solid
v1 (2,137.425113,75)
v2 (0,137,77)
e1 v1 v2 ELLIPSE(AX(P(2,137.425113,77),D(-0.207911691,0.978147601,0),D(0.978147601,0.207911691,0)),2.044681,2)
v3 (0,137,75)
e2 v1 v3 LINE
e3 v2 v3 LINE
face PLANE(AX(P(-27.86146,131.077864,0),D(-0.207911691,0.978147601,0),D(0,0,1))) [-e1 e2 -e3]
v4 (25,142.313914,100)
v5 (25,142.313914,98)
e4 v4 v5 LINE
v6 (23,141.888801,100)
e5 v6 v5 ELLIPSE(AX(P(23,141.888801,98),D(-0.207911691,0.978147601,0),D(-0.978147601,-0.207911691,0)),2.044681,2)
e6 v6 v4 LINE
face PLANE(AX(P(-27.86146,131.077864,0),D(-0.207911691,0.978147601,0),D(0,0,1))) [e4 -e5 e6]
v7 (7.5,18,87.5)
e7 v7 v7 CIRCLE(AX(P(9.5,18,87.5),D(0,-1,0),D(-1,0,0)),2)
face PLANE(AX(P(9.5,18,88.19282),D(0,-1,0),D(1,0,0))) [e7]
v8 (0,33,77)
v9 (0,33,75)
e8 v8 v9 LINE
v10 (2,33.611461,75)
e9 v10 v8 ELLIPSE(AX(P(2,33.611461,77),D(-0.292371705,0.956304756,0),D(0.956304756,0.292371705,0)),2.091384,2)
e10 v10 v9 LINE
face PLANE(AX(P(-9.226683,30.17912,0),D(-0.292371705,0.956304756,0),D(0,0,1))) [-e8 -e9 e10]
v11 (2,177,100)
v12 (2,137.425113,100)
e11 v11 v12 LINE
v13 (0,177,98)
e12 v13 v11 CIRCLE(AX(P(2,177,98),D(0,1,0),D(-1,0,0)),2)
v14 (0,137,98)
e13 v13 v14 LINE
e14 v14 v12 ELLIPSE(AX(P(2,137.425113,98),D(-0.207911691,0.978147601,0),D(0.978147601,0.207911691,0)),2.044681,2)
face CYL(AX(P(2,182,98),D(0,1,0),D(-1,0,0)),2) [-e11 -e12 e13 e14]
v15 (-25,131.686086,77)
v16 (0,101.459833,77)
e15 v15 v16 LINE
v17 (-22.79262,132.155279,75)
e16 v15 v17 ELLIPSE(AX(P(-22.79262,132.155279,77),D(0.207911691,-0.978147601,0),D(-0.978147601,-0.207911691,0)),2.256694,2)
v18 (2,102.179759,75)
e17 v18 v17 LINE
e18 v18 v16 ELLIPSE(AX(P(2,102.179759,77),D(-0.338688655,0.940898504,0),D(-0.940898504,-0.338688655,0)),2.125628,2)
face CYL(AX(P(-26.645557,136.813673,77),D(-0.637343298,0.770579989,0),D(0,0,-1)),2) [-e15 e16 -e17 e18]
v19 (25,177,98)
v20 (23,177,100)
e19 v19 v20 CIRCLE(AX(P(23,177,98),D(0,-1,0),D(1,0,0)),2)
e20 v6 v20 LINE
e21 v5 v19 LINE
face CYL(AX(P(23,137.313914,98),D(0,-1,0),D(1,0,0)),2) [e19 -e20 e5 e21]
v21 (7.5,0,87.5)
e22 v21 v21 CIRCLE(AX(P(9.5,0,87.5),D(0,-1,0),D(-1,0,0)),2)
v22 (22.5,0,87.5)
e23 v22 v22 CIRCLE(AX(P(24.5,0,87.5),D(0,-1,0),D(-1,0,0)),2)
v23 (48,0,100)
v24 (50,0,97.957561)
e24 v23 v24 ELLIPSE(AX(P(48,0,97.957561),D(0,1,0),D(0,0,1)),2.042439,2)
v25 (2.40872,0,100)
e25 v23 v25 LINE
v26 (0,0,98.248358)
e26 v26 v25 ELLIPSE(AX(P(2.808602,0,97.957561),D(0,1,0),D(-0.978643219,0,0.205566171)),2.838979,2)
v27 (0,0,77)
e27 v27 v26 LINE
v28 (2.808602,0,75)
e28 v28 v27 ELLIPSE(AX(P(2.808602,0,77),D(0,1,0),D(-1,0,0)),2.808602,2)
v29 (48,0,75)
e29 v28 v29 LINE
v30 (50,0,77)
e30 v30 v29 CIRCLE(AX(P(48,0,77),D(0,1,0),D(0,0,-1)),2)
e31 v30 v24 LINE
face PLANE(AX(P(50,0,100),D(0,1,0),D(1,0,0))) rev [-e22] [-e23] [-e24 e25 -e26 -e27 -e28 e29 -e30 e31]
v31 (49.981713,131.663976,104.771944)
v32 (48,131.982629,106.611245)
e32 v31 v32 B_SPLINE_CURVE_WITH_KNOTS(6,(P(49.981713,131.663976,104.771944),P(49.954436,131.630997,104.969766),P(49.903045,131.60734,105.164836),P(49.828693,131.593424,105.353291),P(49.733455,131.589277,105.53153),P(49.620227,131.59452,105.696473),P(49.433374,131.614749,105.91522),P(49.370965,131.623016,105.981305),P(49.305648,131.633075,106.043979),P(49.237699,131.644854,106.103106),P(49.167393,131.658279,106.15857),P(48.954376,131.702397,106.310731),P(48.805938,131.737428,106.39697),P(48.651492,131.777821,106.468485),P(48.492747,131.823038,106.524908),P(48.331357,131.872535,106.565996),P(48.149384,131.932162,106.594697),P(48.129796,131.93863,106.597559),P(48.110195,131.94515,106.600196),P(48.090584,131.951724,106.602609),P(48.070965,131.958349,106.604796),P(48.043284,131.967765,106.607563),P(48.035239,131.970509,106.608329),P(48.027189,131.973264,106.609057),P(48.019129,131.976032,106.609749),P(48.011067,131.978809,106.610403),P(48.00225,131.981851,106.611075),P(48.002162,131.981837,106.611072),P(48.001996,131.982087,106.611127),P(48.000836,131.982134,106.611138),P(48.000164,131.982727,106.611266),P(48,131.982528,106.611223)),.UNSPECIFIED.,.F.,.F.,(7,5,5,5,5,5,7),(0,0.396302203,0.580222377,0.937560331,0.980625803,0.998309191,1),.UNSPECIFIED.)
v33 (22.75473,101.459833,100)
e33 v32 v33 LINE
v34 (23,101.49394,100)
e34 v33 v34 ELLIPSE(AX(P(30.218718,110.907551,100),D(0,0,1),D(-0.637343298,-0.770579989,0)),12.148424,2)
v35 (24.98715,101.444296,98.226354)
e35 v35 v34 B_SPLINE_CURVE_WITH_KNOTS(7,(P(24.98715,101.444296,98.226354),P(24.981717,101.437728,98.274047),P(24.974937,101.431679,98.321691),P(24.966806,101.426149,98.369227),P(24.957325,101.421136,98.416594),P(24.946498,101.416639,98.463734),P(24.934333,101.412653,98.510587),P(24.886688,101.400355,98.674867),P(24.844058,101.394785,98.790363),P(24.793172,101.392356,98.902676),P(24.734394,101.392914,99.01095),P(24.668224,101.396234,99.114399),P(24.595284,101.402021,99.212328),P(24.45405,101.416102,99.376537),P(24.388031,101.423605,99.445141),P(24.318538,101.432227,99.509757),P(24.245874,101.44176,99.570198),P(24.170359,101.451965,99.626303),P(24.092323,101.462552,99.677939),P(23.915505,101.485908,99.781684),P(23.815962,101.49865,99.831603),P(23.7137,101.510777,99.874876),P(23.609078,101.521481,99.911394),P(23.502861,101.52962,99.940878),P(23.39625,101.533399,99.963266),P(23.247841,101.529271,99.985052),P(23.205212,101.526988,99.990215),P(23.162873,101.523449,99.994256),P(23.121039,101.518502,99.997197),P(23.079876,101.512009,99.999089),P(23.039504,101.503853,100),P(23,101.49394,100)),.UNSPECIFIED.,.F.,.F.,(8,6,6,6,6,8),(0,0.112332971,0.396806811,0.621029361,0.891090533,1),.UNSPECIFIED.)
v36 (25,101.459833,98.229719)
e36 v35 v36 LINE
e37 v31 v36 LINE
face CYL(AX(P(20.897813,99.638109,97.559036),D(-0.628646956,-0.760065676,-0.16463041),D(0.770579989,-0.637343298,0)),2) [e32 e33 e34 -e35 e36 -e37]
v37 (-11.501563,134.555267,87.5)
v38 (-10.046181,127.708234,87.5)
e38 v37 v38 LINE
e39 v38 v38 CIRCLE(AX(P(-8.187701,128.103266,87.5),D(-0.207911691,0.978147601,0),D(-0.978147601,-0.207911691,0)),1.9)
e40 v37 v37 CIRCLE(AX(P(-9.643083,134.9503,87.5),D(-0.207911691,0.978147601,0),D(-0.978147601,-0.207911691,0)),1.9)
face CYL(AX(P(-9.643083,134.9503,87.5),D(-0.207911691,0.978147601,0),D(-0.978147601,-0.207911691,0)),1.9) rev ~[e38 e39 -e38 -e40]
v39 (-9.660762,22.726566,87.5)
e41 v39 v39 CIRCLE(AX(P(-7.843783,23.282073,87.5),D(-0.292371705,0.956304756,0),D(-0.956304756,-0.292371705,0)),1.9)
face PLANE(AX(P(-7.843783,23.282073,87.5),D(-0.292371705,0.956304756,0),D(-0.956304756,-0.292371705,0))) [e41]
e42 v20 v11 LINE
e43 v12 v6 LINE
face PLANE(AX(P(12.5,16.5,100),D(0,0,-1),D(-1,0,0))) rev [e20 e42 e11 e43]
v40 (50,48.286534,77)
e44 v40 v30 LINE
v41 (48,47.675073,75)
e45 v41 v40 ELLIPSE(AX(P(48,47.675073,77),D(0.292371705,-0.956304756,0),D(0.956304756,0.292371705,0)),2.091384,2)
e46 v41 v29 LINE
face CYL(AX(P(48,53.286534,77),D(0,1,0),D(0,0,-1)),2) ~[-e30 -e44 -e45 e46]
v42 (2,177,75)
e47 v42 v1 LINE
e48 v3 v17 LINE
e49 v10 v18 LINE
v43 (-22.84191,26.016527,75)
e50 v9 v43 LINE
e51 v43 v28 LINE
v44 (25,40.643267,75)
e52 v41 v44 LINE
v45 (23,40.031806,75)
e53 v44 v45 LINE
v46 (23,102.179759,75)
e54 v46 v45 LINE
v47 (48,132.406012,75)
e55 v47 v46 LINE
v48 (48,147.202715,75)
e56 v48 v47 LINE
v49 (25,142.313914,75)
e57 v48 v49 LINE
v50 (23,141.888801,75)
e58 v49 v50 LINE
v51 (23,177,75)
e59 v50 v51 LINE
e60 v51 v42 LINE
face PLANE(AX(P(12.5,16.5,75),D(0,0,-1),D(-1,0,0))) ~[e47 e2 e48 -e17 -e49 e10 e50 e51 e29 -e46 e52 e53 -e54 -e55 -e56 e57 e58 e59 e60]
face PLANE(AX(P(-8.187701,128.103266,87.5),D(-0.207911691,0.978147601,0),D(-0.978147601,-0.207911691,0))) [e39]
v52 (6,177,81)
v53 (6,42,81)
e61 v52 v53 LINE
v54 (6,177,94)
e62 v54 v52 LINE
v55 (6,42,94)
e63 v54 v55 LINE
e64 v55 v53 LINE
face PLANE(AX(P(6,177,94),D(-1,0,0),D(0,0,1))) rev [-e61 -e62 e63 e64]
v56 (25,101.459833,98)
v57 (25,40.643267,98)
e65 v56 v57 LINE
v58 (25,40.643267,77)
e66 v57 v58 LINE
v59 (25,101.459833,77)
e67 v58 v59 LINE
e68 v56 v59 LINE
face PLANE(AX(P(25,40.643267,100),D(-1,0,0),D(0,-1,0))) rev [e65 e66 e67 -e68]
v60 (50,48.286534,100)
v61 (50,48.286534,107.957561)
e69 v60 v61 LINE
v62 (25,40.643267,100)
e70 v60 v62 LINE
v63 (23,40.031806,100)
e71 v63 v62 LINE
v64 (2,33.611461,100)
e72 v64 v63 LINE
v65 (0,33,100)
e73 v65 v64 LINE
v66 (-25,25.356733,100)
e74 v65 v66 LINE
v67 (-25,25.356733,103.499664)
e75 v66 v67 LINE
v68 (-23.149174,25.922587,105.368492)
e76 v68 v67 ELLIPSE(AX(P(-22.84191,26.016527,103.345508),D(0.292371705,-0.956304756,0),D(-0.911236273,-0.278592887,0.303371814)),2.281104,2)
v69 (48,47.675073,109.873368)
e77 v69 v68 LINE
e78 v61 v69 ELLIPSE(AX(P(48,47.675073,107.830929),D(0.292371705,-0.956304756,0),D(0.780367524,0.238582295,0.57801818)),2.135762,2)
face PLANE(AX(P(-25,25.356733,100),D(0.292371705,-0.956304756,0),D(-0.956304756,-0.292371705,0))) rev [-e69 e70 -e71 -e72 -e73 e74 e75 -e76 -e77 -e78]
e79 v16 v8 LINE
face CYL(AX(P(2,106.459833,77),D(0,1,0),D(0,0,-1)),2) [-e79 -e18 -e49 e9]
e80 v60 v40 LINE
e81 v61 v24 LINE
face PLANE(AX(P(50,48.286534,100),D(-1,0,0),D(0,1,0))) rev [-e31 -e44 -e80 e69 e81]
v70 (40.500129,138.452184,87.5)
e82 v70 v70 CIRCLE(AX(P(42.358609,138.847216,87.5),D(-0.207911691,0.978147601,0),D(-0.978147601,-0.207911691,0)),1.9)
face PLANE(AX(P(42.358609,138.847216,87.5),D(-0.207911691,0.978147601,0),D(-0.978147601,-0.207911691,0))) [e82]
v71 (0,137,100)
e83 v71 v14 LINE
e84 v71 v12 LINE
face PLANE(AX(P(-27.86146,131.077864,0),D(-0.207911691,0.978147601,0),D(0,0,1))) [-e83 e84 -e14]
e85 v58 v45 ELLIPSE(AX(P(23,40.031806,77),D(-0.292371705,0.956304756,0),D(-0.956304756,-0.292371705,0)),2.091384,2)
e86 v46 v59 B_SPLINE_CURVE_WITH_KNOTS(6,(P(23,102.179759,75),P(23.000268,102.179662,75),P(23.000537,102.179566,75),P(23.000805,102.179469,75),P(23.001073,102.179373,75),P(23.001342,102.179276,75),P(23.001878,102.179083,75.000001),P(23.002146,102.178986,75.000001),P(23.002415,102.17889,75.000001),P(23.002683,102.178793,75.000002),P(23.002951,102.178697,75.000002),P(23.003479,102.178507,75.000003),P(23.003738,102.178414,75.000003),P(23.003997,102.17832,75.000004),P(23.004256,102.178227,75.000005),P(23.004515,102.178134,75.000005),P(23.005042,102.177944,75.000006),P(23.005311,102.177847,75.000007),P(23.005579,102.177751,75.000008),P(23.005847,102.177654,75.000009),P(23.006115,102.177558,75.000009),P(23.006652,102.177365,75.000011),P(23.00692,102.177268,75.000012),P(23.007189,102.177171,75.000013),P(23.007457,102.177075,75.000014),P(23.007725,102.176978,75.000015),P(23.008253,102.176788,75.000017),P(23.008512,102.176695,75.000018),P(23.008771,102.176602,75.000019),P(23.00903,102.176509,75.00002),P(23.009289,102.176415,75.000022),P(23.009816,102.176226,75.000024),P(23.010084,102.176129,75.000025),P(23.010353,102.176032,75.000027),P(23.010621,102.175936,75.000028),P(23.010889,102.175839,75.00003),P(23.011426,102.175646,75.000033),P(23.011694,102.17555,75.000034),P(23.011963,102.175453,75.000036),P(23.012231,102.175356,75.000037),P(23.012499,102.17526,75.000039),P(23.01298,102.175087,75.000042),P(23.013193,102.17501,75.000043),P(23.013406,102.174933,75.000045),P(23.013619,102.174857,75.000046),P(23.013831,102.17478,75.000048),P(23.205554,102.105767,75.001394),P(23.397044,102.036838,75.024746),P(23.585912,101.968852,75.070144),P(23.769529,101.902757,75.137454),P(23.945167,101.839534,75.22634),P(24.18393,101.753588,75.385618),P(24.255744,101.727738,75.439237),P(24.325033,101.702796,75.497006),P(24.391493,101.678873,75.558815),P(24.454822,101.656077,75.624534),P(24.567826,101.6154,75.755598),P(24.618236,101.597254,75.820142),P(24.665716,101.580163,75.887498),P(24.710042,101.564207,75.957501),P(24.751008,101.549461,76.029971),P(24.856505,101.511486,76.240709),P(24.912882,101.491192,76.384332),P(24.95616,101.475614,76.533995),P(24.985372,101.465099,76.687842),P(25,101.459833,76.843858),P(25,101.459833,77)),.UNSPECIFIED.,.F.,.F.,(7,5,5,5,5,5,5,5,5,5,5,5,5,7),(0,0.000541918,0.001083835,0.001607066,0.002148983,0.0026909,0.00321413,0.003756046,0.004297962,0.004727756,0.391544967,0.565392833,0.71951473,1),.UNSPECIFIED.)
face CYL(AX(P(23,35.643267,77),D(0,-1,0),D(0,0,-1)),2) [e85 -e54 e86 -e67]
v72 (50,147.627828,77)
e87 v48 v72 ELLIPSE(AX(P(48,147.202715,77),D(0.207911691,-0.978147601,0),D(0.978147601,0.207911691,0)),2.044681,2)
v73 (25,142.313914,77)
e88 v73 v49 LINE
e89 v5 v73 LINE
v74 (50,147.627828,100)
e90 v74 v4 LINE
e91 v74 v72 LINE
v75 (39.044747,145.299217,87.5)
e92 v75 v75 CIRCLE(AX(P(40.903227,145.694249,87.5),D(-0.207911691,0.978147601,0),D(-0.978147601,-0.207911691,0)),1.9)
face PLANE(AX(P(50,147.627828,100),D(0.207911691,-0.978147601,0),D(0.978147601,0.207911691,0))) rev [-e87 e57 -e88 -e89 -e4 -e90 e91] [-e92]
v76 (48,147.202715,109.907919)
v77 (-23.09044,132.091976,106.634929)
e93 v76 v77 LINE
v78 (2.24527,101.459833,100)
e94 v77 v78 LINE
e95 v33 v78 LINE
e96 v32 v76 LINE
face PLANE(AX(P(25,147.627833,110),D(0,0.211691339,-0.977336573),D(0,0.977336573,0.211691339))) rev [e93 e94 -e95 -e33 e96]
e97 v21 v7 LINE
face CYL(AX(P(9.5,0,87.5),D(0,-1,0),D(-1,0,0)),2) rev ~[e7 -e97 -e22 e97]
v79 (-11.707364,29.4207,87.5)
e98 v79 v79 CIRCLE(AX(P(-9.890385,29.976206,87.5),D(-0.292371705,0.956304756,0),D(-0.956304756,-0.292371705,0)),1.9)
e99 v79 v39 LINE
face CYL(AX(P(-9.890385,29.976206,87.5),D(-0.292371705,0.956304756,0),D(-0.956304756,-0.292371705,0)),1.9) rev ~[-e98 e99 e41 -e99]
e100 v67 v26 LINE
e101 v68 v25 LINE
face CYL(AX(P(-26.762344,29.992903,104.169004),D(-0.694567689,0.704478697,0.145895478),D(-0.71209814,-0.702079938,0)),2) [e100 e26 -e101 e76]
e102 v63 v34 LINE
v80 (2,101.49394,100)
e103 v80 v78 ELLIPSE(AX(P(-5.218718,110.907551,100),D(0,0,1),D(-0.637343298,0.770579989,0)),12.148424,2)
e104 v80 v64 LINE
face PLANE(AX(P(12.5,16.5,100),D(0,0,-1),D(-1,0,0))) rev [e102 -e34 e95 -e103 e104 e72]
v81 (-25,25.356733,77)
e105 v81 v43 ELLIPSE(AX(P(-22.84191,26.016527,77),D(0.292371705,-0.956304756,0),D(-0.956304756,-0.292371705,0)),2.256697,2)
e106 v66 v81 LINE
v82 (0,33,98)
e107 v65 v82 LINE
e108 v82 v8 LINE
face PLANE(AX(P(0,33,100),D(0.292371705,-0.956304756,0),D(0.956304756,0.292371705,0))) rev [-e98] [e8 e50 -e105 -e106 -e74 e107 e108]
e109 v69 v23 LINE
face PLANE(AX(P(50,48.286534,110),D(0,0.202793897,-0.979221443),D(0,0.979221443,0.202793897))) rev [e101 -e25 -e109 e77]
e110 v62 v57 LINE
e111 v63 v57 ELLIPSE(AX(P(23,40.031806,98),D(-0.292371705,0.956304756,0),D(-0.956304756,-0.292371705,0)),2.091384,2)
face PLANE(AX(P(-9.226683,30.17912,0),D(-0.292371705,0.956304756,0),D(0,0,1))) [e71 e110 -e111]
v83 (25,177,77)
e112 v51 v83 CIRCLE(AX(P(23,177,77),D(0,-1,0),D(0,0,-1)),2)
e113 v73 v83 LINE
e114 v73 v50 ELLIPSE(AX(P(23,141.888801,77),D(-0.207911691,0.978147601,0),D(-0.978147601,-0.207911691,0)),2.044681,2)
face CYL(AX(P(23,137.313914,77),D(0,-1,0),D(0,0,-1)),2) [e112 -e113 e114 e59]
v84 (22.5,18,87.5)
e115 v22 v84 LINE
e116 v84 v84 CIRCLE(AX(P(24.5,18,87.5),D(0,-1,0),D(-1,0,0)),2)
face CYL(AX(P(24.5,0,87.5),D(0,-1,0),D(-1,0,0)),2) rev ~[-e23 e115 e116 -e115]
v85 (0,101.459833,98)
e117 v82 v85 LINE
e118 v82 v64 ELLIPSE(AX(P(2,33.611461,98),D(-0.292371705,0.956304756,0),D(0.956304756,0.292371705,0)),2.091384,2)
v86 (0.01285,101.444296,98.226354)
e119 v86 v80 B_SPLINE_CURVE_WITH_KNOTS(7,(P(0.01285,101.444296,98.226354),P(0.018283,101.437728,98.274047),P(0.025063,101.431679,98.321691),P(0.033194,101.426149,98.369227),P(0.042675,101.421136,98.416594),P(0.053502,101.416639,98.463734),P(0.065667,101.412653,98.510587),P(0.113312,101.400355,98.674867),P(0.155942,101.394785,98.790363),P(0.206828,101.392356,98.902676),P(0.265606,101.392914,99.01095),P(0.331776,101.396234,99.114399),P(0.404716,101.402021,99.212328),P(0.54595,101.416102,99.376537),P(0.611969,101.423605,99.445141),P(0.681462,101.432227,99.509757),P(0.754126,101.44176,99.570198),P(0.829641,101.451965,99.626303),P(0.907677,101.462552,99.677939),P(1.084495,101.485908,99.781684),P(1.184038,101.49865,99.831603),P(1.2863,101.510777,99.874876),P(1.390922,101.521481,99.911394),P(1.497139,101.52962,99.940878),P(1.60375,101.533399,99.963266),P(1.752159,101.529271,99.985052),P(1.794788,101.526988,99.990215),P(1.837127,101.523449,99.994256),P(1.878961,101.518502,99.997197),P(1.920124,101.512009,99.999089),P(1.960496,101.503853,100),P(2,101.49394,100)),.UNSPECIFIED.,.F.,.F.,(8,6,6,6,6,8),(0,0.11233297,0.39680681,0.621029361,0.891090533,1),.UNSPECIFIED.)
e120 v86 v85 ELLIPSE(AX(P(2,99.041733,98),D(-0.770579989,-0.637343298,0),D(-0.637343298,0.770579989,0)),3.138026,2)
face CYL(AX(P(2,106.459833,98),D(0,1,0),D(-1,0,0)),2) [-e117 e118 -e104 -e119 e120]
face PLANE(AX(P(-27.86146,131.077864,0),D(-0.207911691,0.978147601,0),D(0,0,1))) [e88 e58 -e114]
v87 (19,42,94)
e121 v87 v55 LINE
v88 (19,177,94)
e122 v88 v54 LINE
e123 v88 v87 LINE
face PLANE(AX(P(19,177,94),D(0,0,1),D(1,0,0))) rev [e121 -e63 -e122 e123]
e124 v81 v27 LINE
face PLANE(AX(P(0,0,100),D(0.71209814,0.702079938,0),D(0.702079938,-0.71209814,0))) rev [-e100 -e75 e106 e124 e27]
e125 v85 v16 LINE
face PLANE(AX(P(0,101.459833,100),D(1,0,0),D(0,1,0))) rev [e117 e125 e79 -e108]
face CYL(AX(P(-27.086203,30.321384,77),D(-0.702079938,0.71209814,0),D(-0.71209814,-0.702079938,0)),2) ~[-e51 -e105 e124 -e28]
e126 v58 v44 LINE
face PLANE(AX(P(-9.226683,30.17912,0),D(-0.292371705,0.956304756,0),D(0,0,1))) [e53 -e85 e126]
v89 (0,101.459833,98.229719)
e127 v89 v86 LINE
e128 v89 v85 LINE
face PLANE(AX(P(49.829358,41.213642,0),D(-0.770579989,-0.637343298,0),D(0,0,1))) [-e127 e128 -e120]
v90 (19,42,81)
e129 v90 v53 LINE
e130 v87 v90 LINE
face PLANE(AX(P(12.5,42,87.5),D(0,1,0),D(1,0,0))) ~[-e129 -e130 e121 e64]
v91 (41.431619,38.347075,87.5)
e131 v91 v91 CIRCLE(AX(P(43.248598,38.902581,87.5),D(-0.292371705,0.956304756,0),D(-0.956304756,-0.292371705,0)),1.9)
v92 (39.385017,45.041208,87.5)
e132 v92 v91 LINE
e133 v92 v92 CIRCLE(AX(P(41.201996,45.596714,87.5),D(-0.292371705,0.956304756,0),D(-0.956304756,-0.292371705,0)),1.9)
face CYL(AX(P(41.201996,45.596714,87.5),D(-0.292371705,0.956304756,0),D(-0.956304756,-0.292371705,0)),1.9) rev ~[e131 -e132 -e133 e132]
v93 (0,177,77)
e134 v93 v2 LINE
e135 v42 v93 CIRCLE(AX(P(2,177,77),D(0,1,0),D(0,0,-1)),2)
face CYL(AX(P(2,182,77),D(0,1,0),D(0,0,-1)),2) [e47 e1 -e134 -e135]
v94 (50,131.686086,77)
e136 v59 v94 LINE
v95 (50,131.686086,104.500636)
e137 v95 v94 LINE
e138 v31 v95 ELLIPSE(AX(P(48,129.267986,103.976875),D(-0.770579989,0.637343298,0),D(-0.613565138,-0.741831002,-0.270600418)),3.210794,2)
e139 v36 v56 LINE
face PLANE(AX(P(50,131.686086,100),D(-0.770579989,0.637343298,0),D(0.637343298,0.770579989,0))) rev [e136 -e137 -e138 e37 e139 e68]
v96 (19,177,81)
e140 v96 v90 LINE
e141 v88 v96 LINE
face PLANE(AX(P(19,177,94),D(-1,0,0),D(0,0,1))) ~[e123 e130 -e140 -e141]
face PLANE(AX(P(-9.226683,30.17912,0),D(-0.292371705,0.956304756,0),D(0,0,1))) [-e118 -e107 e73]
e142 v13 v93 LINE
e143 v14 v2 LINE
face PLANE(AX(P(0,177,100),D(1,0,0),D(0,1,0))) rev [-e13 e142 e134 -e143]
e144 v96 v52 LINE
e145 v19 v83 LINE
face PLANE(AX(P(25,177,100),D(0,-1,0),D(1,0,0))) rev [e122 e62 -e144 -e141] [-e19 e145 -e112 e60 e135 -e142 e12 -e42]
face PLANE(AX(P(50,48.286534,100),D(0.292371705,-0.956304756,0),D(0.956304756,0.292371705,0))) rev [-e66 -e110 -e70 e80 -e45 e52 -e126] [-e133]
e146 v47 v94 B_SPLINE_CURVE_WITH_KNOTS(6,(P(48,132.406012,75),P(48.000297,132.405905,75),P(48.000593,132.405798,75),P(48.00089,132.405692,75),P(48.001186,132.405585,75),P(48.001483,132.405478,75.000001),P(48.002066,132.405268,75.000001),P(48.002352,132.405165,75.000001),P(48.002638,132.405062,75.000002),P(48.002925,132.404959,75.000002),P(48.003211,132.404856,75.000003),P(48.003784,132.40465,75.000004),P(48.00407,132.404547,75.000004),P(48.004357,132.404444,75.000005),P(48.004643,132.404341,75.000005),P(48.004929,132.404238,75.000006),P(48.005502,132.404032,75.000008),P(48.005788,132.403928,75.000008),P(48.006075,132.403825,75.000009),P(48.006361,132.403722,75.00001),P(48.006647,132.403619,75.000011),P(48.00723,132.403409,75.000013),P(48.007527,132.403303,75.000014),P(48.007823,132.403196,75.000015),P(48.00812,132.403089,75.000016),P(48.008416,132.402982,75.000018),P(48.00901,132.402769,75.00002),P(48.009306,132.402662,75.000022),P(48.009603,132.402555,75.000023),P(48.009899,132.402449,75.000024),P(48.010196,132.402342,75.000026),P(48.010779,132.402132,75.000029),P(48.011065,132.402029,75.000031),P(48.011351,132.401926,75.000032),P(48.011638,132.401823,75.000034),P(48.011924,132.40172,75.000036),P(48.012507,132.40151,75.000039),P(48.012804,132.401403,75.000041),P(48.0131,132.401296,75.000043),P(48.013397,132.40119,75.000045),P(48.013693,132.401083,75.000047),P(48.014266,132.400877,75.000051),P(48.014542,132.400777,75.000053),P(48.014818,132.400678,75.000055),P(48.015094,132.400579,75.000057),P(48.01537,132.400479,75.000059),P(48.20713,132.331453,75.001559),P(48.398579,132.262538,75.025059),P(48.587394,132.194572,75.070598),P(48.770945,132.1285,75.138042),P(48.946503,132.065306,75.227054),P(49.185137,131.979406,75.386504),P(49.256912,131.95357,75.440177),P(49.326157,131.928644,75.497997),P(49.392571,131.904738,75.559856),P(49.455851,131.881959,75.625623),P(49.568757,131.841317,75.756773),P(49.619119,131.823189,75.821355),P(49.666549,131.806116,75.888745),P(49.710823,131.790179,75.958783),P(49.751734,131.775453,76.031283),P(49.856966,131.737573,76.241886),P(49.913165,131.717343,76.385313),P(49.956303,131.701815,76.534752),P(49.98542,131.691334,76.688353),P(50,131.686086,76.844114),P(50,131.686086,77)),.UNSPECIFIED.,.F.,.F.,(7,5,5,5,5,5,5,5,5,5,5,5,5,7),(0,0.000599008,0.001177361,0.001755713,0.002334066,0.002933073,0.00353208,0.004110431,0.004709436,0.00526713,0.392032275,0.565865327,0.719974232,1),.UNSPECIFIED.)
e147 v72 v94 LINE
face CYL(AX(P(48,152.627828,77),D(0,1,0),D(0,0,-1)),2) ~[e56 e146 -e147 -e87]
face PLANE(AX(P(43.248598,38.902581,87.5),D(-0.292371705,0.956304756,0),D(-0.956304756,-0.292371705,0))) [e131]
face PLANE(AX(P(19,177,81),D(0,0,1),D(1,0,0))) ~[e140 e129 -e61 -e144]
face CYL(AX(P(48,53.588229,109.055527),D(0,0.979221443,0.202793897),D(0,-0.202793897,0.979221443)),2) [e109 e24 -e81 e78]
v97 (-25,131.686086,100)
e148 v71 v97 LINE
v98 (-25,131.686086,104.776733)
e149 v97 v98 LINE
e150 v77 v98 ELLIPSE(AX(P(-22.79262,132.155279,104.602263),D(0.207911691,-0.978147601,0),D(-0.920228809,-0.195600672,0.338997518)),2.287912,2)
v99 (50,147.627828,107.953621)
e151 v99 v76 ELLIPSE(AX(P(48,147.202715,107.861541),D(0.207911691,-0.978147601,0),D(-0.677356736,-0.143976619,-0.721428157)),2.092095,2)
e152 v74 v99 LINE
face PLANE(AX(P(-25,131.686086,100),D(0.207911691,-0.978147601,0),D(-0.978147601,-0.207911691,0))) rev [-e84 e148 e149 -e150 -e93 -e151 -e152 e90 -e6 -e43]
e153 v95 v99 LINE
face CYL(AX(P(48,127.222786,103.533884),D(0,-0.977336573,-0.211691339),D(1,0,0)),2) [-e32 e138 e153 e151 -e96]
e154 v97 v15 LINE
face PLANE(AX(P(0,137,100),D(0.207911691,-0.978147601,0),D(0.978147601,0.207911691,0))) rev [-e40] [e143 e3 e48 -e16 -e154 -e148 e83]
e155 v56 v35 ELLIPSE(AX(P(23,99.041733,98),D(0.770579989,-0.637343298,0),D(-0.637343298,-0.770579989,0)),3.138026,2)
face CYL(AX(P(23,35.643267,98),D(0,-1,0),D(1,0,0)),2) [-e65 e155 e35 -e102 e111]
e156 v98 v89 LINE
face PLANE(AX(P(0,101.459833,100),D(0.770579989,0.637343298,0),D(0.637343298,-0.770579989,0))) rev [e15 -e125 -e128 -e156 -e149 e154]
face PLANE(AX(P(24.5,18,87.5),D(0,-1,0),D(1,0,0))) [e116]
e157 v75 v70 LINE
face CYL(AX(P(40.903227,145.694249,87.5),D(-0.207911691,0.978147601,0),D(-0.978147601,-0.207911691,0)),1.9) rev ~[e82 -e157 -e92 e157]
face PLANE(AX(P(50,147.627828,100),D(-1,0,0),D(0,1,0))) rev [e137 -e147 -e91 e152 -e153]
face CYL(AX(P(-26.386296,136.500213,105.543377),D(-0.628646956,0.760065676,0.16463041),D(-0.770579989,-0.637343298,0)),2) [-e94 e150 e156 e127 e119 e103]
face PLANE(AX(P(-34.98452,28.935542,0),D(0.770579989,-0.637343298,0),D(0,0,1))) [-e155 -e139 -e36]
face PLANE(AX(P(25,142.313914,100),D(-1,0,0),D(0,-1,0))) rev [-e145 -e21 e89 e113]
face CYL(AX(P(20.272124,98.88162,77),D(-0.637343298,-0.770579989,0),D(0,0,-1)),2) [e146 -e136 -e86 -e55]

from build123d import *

# Parameters (mm, degrees)
F0_W           = 25
F0_H           = 33
F1_DEPTH       = 25
F3_DEPTH       = 10
F5_DEPTH       = 81.7
F7_DEPTH       = 10
F9_DEPTH       = 92
F10_W          = 13
F10_H          = 13
F11_DEPTH      = 135
F14_W          = 99.2073006928
F14_H          = 199.154949747
F15_DEPTH      = 88
F16_R          = 1.9
F17_DEPTH      = 7
F18_R          = 1.9
F19_DEPTH      = 7
F21_DEPTH      = 18
F22_T1_DEPTH   = 58.2865340729
F22_T3_DEPTH   = 59.3111485648
F22_T5_DEPTH   = 45.6084808239
F22_T7_DEPTH   = 44.6581070284
F22_T9_DEPTH   = 26.3114146799
F22_T11_DEPTH  = 25.9417421253
F22_T16_DEPTH  = 70.8165659944
F22_T23_DEPTH  = 70.8165659944
F22_T29_DEPTH  = 70.8165659944
F22_T35_DEPTH  = 78.4598330308
F22_T41_DEPTH  = 78.4598330308
F22_T47_DEPTH  = 78.4598330308
F22_T54_DEPTH  = 70.8165659944
F22_T60_DEPTH  = 78.4598330308
F22_T66_DEPTH  = 49.2253281189
F22_T71_DEPTH  = 48.4985768834
F22_T77_DEPTH  = 48.4985768834
F22_T83_DEPTH  = 48.4985768834
F22_T89_DEPTH  = 49.2253281189
F22_T94_DEPTH  = 48.4985768834
F22_T100_DEPTH = 48.4985768834
F22_T106_DEPTH = 48.4985768834
F22_T112_DEPTH = 44.6860859582
F22_T117_DEPTH = 50
F22_T122_DEPTH = 44.6860859582
F22_T127_DEPTH = 50
F22_T133_DEPTH = 70.8165659944
F22_T138_DEPTH = 48.4985768834
F22_T146_DEPTH = 48.4985768834
F22_T151_DEPTH = 78.4598330308
F22_T159_DEPTH = 70.8165659944
F22_T163_DEPTH = 49.2253281189
F22_T170_DEPTH = 49.2253281189
F22_T174_DEPTH = 78.4598330308


# Not quite as in the source:
# - a fillet or chamfer that OpenCascade refuses, or shapes differently, is made with other operations: its cross-section is extruded or revolved along the edge and cut away or added


with BuildPart() as f1:
    # F0 (on Top) → F1 (new body)
    with BuildSketch(Plane.XY):
        with Locations((12.5, 16.5)):
            Rectangle(F0_W, F0_H)
        Polygon((-25, 25.3567329635), (0, 0), (0, 33), align=None)
        with Locations((37.5, 16.5)):
            Rectangle(F0_W, F0_H)
        Polygon((25, 40.6432670365), (0, 33), (25, 33), align=None)
        Polygon((0, 101.4598330308), (0, 33), (25, 40.6432670365), (25, 101.4598330308), (25, 137), (0, 137), align=None)
        Polygon((25, 40.6432670365), (25, 33), (50, 33), (50, 48.2865340729), align=None)
        Polygon((-25, 131.6860859582), (0, 101.4598330308), (0, 137), align=None)
        Polygon((25, 137), (25, 101.4598330308), (50, 131.6860859582), (50, 147.6278280835), (25, 142.3139140418), align=None)
        Polygon((25, 142.3139140418), (0, 137), (25, 137), align=None)
        Polygon((0, 177), (0, 137), (25, 142.3139140418), (25, 177), align=None)
    extrude(amount=F1_DEPTH)

    # F2 (on face) → F3 (join)
    with BuildSketch(Plane(origin=(0, 0, 0), x_dir=(1, 0, 0), z_dir=(0, 0, -1))):
        Polygon((50, -131.6860859582), (25, -101.4598330308), (0, -101.4598330308), (-25, -131.6860859582), (50, -147.6278280835), align=None)
    extrude(amount=F3_DEPTH)

    # F4 (on face) → F5 (cut, symmetric)
    with BuildSketch(Plane.YZ.offset(25)):
        Polygon((101.4598330308, -21.1370438337), (147.6278330308, -10), (101.4598330308, 0), align=None)
    extrude(amount=F5_DEPTH, both=True, mode=Mode.SUBTRACT)

    # F6 (on face) → F7 (join)
    with BuildSketch(Plane(origin=(0, 0, 0), x_dir=(1, 0, 0), z_dir=(0, 0, -1))):
        Polygon((50, -48.2865340729), (50, 0), (0, 0), (-25, -25.3567329635), align=None)
    extrude(amount=F7_DEPTH)

    # F8 (on face) → F9 (cut)
    with BuildSketch(Plane.YZ.offset(50)):
        Polygon((48.2865340729, -10), (0, 0), (0, -39.534393698), (48.2865340729, -39.534393698), align=None)
    extrude(amount=-F9_DEPTH, mode=Mode.SUBTRACT)

    # F10 (on face) → F11 (cut)
    with BuildSketch(Plane(origin=(0, 177, 0), x_dir=(-1, 0, 0), z_dir=(0, 1, 0))):
        with Locations((-12.5, 12.5)):
            Rectangle(F10_W, F10_H)
    extrude(amount=-F11_DEPTH, mode=Mode.SUBTRACT)


with BuildPart() as f13_1:
    # F13: instance of F1
    add(f1.part.mirror(Plane(origin=(16.2715907381, 80.4050719696, 50), x_dir=(1, 0, 0), z_dir=(0, 0, 1))))

    # F16 (on face) → F17 (cut)
    with BuildSketch(Plane(origin=(-27.8614600507, 131.0778638485, 0), x_dir=(-0.9781476007, -0.2079116908, 0), z_dir=(-0.2079116908, 0.9781476007, 0))):
        with Locations((-18.6253867704, 87.5)):
            Circle(F16_R)
        with BuildLine():
            ThreePointArc((-72.2009313853, 87.5), (-70.3009313853, 85.6), (-68.4009313853, 87.5))
            ThreePointArc((-68.4009313853, 87.5), (-70.3009313853, 89.4), (-72.2009313853, 87.5))
        make_face()
    extrude(amount=-F17_DEPTH, mode=Mode.SUBTRACT)

    # F18 (on face) → F19 (cut)
    with BuildSketch(Plane(origin=(-9.2266829073, 30.1791199472, 0), x_dir=(-0.956304756, -0.2923717047, 0), z_dir=(-0.2923717047, 0.956304756, 0))):
        with Locations((0.6940276563, 87.5)):
            Circle(F18_R)
        with BuildLine():
            ThreePointArc((-54.6328540802, 87.5), (-52.7328540802, 85.6), (-50.8328540802, 87.5))
            ThreePointArc((-50.8328540802, 87.5), (-52.7328540802, 89.4), (-54.6328540802, 87.5))
        make_face()
    extrude(amount=-F19_DEPTH, mode=Mode.SUBTRACT)

    # F20 (on face) → F21 (cut)
    with BuildSketch(Plane.XZ):
        with BuildLine():
            ThreePointArc((11.5, 87.5), (9.5, 89.5), (7.5, 87.5))
            Line((7.5, 87.5), (9.5, 87.5))
            Line((9.5, 87.5), (11.5, 87.5))
        make_face()
        with BuildLine():
            ThreePointArc((26.5, 87.5), (24.5, 89.5), (22.5, 87.5))
            ThreePointArc((22.5, 87.5), (24.5, 85.5), (26.5, 87.5))
        make_face()
        with BuildLine():
            Line((9.5, 87.5), (7.5, 87.5))
            ThreePointArc((7.5, 87.5), (9.5, 85.5), (11.5, 87.5))
            Line((11.5, 87.5), (9.5, 87.5))
        make_face()
    extrude(amount=-F21_DEPTH, mode=Mode.SUBTRACT)

    # F22: fillet of radius 2 on 18 edges, made by hand

    # F22_s2 → F22_t1 (cut)
    with BuildSketch(Plane.XZ.offset(-53.2865340729)):
        with BuildLine():
            ThreePointArc((48, 75), (49.4142135624, 75.5857864376), (50, 77))
            Line((50, 77), (50, 75))
            Line((50, 75), (48, 75))
        make_face()
    extrude(amount=F22_T1_DEPTH, mode=Mode.SUBTRACT)

    # F22_s4 → F22_t3 (cut)
    with BuildSketch(Plane(origin=(0, 73.0406545768, 15.1265059668), x_dir=(1, 0, 0), z_dir=(0, -0.9792214434, -0.2027938973))):
        with BuildLine():
            ThreePointArc((48, 97.9221443392), (49.4142135624, 97.3363579016), (50, 95.9221443392))
            Line((50, 95.9221443392), (50, 97.9221443392))
            Line((50, 97.9221443392), (48, 97.9221443392))
        make_face()
    extrude(amount=F22_T3_DEPTH, mode=Mode.SUBTRACT)

    # F22_s6 → F22_t5 (cut)
    with BuildSketch(Plane(origin=(-28.5103996887, 28.9172236636, 0), x_dir=(0, 0, 1), z_dir=(0.7020799377, -0.71209814, 0))):
        with BuildLine():
            ThreePointArc((77, 0), (75.5857864376, -0.5857864376), (75, -2))
            Line((75, -2), (75, 0))
            Line((75, 0), (77, 0))
        make_face()
    extrude(amount=F22_T5_DEPTH, mode=Mode.SUBTRACT)

    # F22_s8 → F22_t7 (cut)
    with BuildSketch(Plane(origin=(-38.1424676079, 38.6867346281, 8.0119096081), x_dir=(0.71209814, 0.7020799377, 0), z_dir=(0.6945676893, -0.7044786969, -0.145895478))):
        with BuildLine():
            ThreePointArc((0, 97.1971020036), (0.4884593774, 98.5067756066), (1.7152449464, 99.1767268568))
            Line((1.7152449464, 99.1767268568), (0, 98.9300009856))
            Line((0, 98.9300009856), (0, 97.1971020036))
        make_face()
    extrude(amount=F22_T7_DEPTH, mode=Mode.SUBTRACT)

    # F22_s10 → F22_t9 (cut)
    with BuildSketch(Plane(origin=(0, 142.94202974, 30.9612783183), x_dir=(1, 0, 0), z_dir=(0, 0.9773365731, 0.2116913388))):
        with BuildLine():
            ThreePointArc((50, -74.2554894164), (49.4142135624, -75.6697029788), (48, -76.2554894164))
            Line((48, -76.2554894164), (50, -76.2554894164))
            Line((50, -76.2554894164), (50, -74.2554894164))
        make_face()
    extrude(amount=F22_T9_DEPTH, mode=Mode.SUBTRACT)

    # F22_s12 → F22_t11 (cut)
    with BuildSketch(Plane.XZ.offset(-152.6278280835)):
        with BuildLine():
            ThreePointArc((48, 75), (49.4142135624, 75.5857864376), (50, 77))
            Line((50, 77), (50, 75))
            Line((50, 75), (48, 75))
        make_face()
    extrude(amount=F22_T11_DEPTH, mode=Mode.SUBTRACT)


with BuildPart() as f1_1:
    add(f1.part)

    # F14 (on offset) → F15 (cut)
    with BuildSketch(Plane.XY.offset(50)):
        with Locations((12.7710904926, 90.3895613737)):
            Rectangle(F14_W, F14_H)
    extrude(amount=-F15_DEPTH, mode=Mode.SUBTRACT)


with BuildPart() as f22_tool14:
    # F22_s15 → F22_t16 (new body)
    with BuildSketch(Plane.XZ.offset(-35.6432670365)):
        with BuildLine():
            ThreePointArc((25, 98), (24.4142135624, 99.4142135624), (23, 100))
            Line((23, 100), (25, 100))
            Line((25, 100), (25, 98))
        make_face()
    extrude(amount=-F22_T16_DEPTH)

    split(bisect_by=Plane(origin=(-9.2266829073, 30.1791199472, 0), x_dir=(0, 0, 1), z_dir=(-0.2923717047, 0.956304756, 0)), keep=Keep.TOP)

    split(bisect_by=Plane(origin=(-34.9845202296, 28.9355418232, 0), x_dir=(0, 0, 1), z_dir=(0.7705799894, -0.6373432983, 0)), keep=Keep.TOP)

    split(bisect_by=Plane(origin=(0, -16.1426266471, 74.5272787043), x_dir=(1, 0, 0), z_dir=(0, -0.2116913388, 0.9773365731)), keep=Keep.TOP)


with BuildPart() as f13_1_1:
    add(f13_1.part)

    # F22_t13: cut F22_tool14
    add(f22_tool14.part, mode=Mode.SUBTRACT)


with BuildPart() as f22_tool21:
    # F22_s22 → F22_t23 (new body)
    with BuildSketch(Plane.XZ.offset(-35.6432670365)):
        with BuildLine():
            ThreePointArc((25, 98), (24.4142135624, 99.4142135624), (23, 100))
            Line((23, 100), (25, 100))
            Line((25, 100), (25, 98))
        make_face()
    extrude(amount=-F22_T23_DEPTH)

    split(bisect_by=Plane(origin=(-34.9845202296, 28.9355418232, 0), x_dir=(0, 0, 1), z_dir=(-0.7705799894, 0.6373432983, 0)), keep=Keep.TOP)

    split(bisect_by=Plane(origin=(0, -16.1426266471, 74.5272787043), x_dir=(1, 0, 0), z_dir=(0, -0.2116913388, 0.9773365731)), keep=Keep.TOP)


with BuildPart() as f13_1_2:
    add(f13_1_1.part)

    # F22_t20: cut F22_tool21
    add(f22_tool21.part, mode=Mode.SUBTRACT)


with BuildPart() as f22_tool27:
    # F22_s28 → F22_t29 (new body)
    with BuildSketch(Plane.XZ.offset(-35.6432670365)):
        with BuildLine():
            ThreePointArc((25, 98), (24.4142135624, 99.4142135624), (23, 100))
            Line((23, 100), (25, 100))
            Line((25, 100), (25, 98))
        make_face()
    extrude(amount=-F22_T29_DEPTH)

    split(bisect_by=Plane(origin=(-34.9845202296, 28.9355418232, 0), x_dir=(0, 0, 1), z_dir=(0.7705799894, -0.6373432983, 0)), keep=Keep.TOP)

    split(bisect_by=Plane(origin=(0, -16.1426266471, 74.5272787043), x_dir=(1, 0, 0), z_dir=(0, 0.2116913388, -0.9773365731)), keep=Keep.TOP)


with BuildPart() as f13_1_3:
    add(f13_1_2.part)

    # F22_t26: cut F22_tool27
    add(f22_tool27.part, mode=Mode.SUBTRACT)


with BuildPart() as f22_tool33:
    # F22_s34 → F22_t35 (new body)
    with BuildSketch(Plane.XZ.offset(-106.4598330308)):
        with BuildLine():
            ThreePointArc((0, 98), (0.5857864376, 99.4142135624), (2, 100))
            Line((2, 100), (0, 100))
            Line((0, 100), (0, 98))
        make_face()
    extrude(amount=F22_T35_DEPTH)

    split(bisect_by=Plane(origin=(49.8293582326, 41.2136416249, 0), x_dir=(0, 0, 1), z_dir=(0.7705799894, 0.6373432983, 0)), keep=Keep.TOP)

    split(bisect_by=Plane(origin=(0, -16.1426266471, 74.5272787043), x_dir=(1, 0, 0), z_dir=(0, -0.2116913388, 0.9773365731)), keep=Keep.TOP)


with BuildPart() as f13_1_4:
    add(f13_1_3.part)

    # F22_t32: cut F22_tool33
    add(f22_tool33.part, mode=Mode.SUBTRACT)


with BuildPart() as f22_tool39:
    # F22_s40 → F22_t41 (new body)
    with BuildSketch(Plane.XZ.offset(-106.4598330308)):
        with BuildLine():
            ThreePointArc((0, 98), (0.5857864376, 99.4142135624), (2, 100))
            Line((2, 100), (0, 100))
            Line((0, 100), (0, 98))
        make_face()
    extrude(amount=F22_T41_DEPTH)

    split(bisect_by=Plane(origin=(49.8293582326, 41.2136416249, 0), x_dir=(0, 0, 1), z_dir=(-0.7705799894, -0.6373432983, 0)), keep=Keep.TOP)

    split(bisect_by=Plane(origin=(0, -16.1426266471, 74.5272787043), x_dir=(1, 0, 0), z_dir=(0, 0.2116913388, -0.9773365731)), keep=Keep.TOP)


with BuildPart() as f13_1_5:
    add(f13_1_4.part)

    # F22_t38: cut F22_tool39
    add(f22_tool39.part, mode=Mode.SUBTRACT)


with BuildPart() as f22_tool45:
    # F22_s46 → F22_t47 (new body)
    with BuildSketch(Plane.XZ.offset(-106.4598330308)):
        with BuildLine():
            ThreePointArc((0, 98), (0.5857864376, 99.4142135624), (2, 100))
            Line((2, 100), (0, 100))
            Line((0, 100), (0, 98))
        make_face()
    extrude(amount=F22_T47_DEPTH)

    split(bisect_by=Plane(origin=(-9.2266829073, 30.1791199472, 0), x_dir=(0, 0, 1), z_dir=(-0.2923717047, 0.956304756, 0)), keep=Keep.TOP)

    split(bisect_by=Plane(origin=(49.8293582326, 41.2136416249, 0), x_dir=(0, 0, 1), z_dir=(-0.7705799894, -0.6373432983, 0)), keep=Keep.TOP)

    split(bisect_by=Plane(origin=(0, -16.1426266471, 74.5272787043), x_dir=(1, 0, 0), z_dir=(0, -0.2116913388, 0.9773365731)), keep=Keep.TOP)


with BuildPart() as f13_1_6:
    add(f13_1_5.part)

    # F22_t44: cut F22_tool45
    add(f22_tool45.part, mode=Mode.SUBTRACT)


with BuildPart() as f22_tool52:
    # F22_s53 → F22_t54 (new body)
    with BuildSketch(Plane.XZ.offset(-35.6432670365)):
        with BuildLine():
            ThreePointArc((23, 75), (24.4142135624, 75.5857864376), (25, 77))
            Line((25, 77), (25, 75))
            Line((25, 75), (23, 75))
        make_face()
    extrude(amount=-F22_T54_DEPTH)

    split(bisect_by=Plane(origin=(-9.2266829073, 30.1791199472, 0), x_dir=(0, 0, 1), z_dir=(-0.2923717047, 0.956304756, 0)), keep=Keep.TOP)

    split(bisect_by=Plane(origin=(-34.9845202296, 28.9355418232, 0), x_dir=(0, 0, 1), z_dir=(0.7705799894, -0.6373432983, 0)), keep=Keep.TOP)


with BuildPart() as f13_1_7:
    add(f13_1_6.part)

    # F22_t51: cut F22_tool52
    add(f22_tool52.part, mode=Mode.SUBTRACT)


with BuildPart() as f22_tool58:
    # F22_s59 → F22_t60 (new body)
    with BuildSketch(Plane.XZ.offset(-106.4598330308)):
        with BuildLine():
            ThreePointArc((2, 75), (0.5857864376, 75.5857864376), (0, 77))
            Line((0, 77), (0, 75))
            Line((0, 75), (2, 75))
        make_face()
    extrude(amount=F22_T60_DEPTH)

    split(bisect_by=Plane(origin=(-9.2266829073, 30.1791199472, 0), x_dir=(0, 0, 1), z_dir=(-0.2923717047, 0.956304756, 0)), keep=Keep.TOP)

    split(bisect_by=Plane(origin=(49.8293582326, 41.2136416249, 0), x_dir=(0, 0, 1), z_dir=(-0.7705799894, -0.6373432983, 0)), keep=Keep.TOP)


with BuildPart() as f13_1_8:
    add(f13_1_7.part)

    # F22_t57: cut F22_tool58
    add(f22_tool58.part, mode=Mode.SUBTRACT)


with BuildPart() as f22_tool64:
    # F22_s65 → F22_t66 (new body)
    with BuildSketch(Plane(origin=(-78.016074724, 94.3253442805, 0), x_dir=(0, 0, 1), z_dir=(0.6373432983, -0.7705799894, 0))):
        with BuildLine():
            ThreePointArc((75, -66.6647446284), (75.5857864376, -65.250531066), (77, -64.6647446284))
            Line((77, -64.6647446284), (75, -64.6647446284))
            Line((75, -64.6647446284), (75, -66.6647446284))
        make_face()
    extrude(amount=F22_T66_DEPTH)

    split(bisect_by=Plane.YZ, keep=Keep.BOTTOM)


with BuildPart() as f13_1_9:
    add(f13_1_8.part)

    # F22_t63: cut F22_tool64
    add(f22_tool64.part, mode=Mode.SUBTRACT)


with BuildPart() as f22_tool69:
    # F22_s70 → F22_t71 (new body)
    with BuildSketch(Plane(origin=(-86.5725065584, 104.6704991917, 22.6716555172), x_dir=(0.7705799894, 0.6373432983, 0), z_dir=(0.6286469564, -0.7600656763, -0.1646304099))):
        with BuildLine():
            ThreePointArc((64.6647446284, 84.0181212592), (65.1581457726, 85.3334766818), (66.3949045162, 85.9998342338))
            Line((66.3949045162, 85.9998342338), (64.6647446284, 85.7642468686))
            Line((64.6647446284, 85.7642468686), (64.6647446284, 84.0181212592))
        make_face()
    extrude(amount=F22_T71_DEPTH)

    split(bisect_by=Plane.YZ, keep=Keep.BOTTOM)

    split(bisect_by=Plane.XY.offset(100), keep=Keep.TOP)


with BuildPart() as f13_1_10:
    add(f13_1_9.part)

    # F22_t68: cut F22_tool69
    add(f22_tool69.part, mode=Mode.SUBTRACT)


with BuildPart() as f22_tool75:
    # F22_s76 → F22_t77 (new body)
    with BuildSketch(Plane(origin=(-86.5725065584, 104.6704991917, 22.6716555172), x_dir=(0.7705799894, 0.6373432983, 0), z_dir=(0.6286469564, -0.7600656763, -0.1646304099))):
        with BuildLine():
            ThreePointArc((64.6647446284, 84.0181212592), (65.1581457726, 85.3334766818), (66.3949045162, 85.9998342338))
            Line((66.3949045162, 85.9998342338), (64.6647446284, 85.7642468686))
            Line((64.6647446284, 85.7642468686), (64.6647446284, 84.0181212592))
        make_face()
    extrude(amount=F22_T77_DEPTH)

    split(bisect_by=Plane.YZ, keep=Keep.TOP)

    split(bisect_by=Plane.XY.offset(100), keep=Keep.TOP)


with BuildPart() as f13_1_11:
    add(f13_1_10.part)

    # F22_t74: cut F22_tool75
    add(f22_tool75.part, mode=Mode.SUBTRACT)


with BuildPart() as f22_tool81:
    # F22_s82 → F22_t83 (new body)
    with BuildSketch(Plane(origin=(-86.5725065584, 104.6704991917, 22.6716555172), x_dir=(0.7705799894, 0.6373432983, 0), z_dir=(0.6286469564, -0.7600656763, -0.1646304099))):
        with BuildLine():
            ThreePointArc((64.6647446284, 84.0181212592), (65.1581457726, 85.3334766818), (66.3949045162, 85.9998342338))
            Line((66.3949045162, 85.9998342338), (64.6647446284, 85.7642468686))
            Line((64.6647446284, 85.7642468686), (64.6647446284, 84.0181212592))
        make_face()
    extrude(amount=F22_T83_DEPTH)

    split(bisect_by=Plane.YZ, keep=Keep.BOTTOM)

    split(bisect_by=Plane.XY.offset(100), keep=Keep.BOTTOM)


with BuildPart() as f13_1_12:
    add(f13_1_11.part)

    # F22_t80: cut F22_tool81
    add(f22_tool81.part, mode=Mode.SUBTRACT)


with BuildPart() as f22_tool87:
    # F22_s88 → F22_t89 (new body)
    with BuildSketch(Plane(origin=(56.7978037382, 68.6713912604, 0), x_dir=(0, 0, 1), z_dir=(0.6373432983, 0.7705799894, 0))):
        with BuildLine():
            ThreePointArc((75, -47.4002448925), (75.5857864376, -45.9860313302), (77, -45.4002448925))
            Line((77, -45.4002448925), (75, -45.4002448925))
            Line((75, -45.4002448925), (75, -47.4002448925))
        make_face()
    extrude(amount=F22_T89_DEPTH)

    split(bisect_by=Plane.YZ.offset(25), keep=Keep.TOP)


with BuildPart() as f13_1_13:
    add(f13_1_12.part)

    # F22_t86: cut F22_tool87
    add(f22_tool87.part, mode=Mode.SUBTRACT)


with BuildPart() as f22_tool92:
    # F22_s93 → F22_t94 (new body)
    with BuildSketch(Plane(origin=(65.9639487049, 79.7537199058, 17.2746750792), x_dir=(-0.7705799894, 0.6373432983, 0), z_dir=(0.6286469564, 0.7600656763, 0.1646304099))):
        with BuildLine():
            ThreePointArc((45.4002448925, 81.3949690485), (45.8936460368, 82.7103244711), (47.1304047803, 83.3766820231))
            Line((47.1304047803, 83.3766820231), (45.4002448925, 83.1410946579))
            Line((45.4002448925, 83.1410946579), (45.4002448925, 81.3949690485))
        make_face()
    extrude(amount=F22_T94_DEPTH)

    split(bisect_by=Plane.YZ.offset(25), keep=Keep.BOTTOM)

    split(bisect_by=Plane.XY.offset(100), keep=Keep.TOP)


with BuildPart() as f13_1_14:
    add(f13_1_13.part)

    # F22_t91: cut F22_tool92
    add(f22_tool92.part, mode=Mode.SUBTRACT)


with BuildPart() as f22_tool98:
    # F22_s99 → F22_t100 (new body)
    with BuildSketch(Plane(origin=(65.9639487049, 79.7537199058, 17.2746750792), x_dir=(-0.7705799894, 0.6373432983, 0), z_dir=(0.6286469564, 0.7600656763, 0.1646304099))):
        with BuildLine():
            ThreePointArc((45.4002448925, 81.3949690485), (45.8936460368, 82.7103244711), (47.1304047803, 83.3766820231))
            Line((47.1304047803, 83.3766820231), (45.4002448925, 83.1410946579))
            Line((45.4002448925, 83.1410946579), (45.4002448925, 81.3949690485))
        make_face()
    extrude(amount=F22_T100_DEPTH)

    split(bisect_by=Plane.YZ.offset(25), keep=Keep.TOP)

    split(bisect_by=Plane.XY.offset(100), keep=Keep.BOTTOM)


with BuildPart() as f13_1_15:
    add(f13_1_14.part)

    # F22_t97: cut F22_tool98
    add(f22_tool98.part, mode=Mode.SUBTRACT)


with BuildPart() as f22_tool104:
    # F22_s105 → F22_t106 (new body)
    with BuildSketch(Plane(origin=(65.9639487049, 79.7537199058, 17.2746750792), x_dir=(-0.7705799894, 0.6373432983, 0), z_dir=(0.6286469564, 0.7600656763, 0.1646304099))):
        with BuildLine():
            ThreePointArc((45.4002448925, 81.3949690485), (45.8936460368, 82.7103244711), (47.1304047803, 83.3766820231))
            Line((47.1304047803, 83.3766820231), (45.4002448925, 83.1410946579))
            Line((45.4002448925, 83.1410946579), (45.4002448925, 81.3949690485))
        make_face()
    extrude(amount=F22_T106_DEPTH)

    split(bisect_by=Plane.YZ.offset(25), keep=Keep.TOP)

    split(bisect_by=Plane.XY.offset(100), keep=Keep.TOP)


with BuildPart() as f13_1_16:
    add(f13_1_15.part)

    # F22_t103: cut F22_tool104
    add(f22_tool104.part, mode=Mode.SUBTRACT)


with BuildPart() as f22_tool110:
    # F22_s111 → F22_t112 (new body)
    with BuildSketch(Plane.XZ.offset(-137.3139140418)):
        with BuildLine():
            ThreePointArc((25, 98), (24.4142135624, 99.4142135624), (23, 100))
            Line((23, 100), (25, 100))
            Line((25, 100), (25, 98))
        make_face()
    extrude(amount=-F22_T112_DEPTH)

    split(bisect_by=Plane(origin=(-27.8614600507, 131.0778638485, 0), x_dir=(0, 0, 1), z_dir=(-0.2079116908, 0.9781476007, 0)), keep=Keep.TOP)


with BuildPart() as f13_1_17:
    add(f13_1_16.part)

    # F22_t109: cut F22_tool110
    add(f22_tool110.part, mode=Mode.SUBTRACT)


with BuildPart() as f22_tool115:
    # F22_s116 → F22_t117 (new body)
    with BuildSketch(Plane.XZ.offset(-182)):
        with BuildLine():
            ThreePointArc((2, 75), (0.5857864376, 75.5857864376), (0, 77))
            Line((0, 77), (0, 75))
            Line((0, 75), (2, 75))
        make_face()
    extrude(amount=F22_T117_DEPTH)

    split(bisect_by=Plane(origin=(-27.8614600507, 131.0778638485, 0), x_dir=(0, 0, 1), z_dir=(-0.2079116908, 0.9781476007, 0)), keep=Keep.TOP)


with BuildPart() as f13_1_18:
    add(f13_1_17.part)

    # F22_t114: cut F22_tool115
    add(f22_tool115.part, mode=Mode.SUBTRACT)


with BuildPart() as f22_tool120:
    # F22_s121 → F22_t122 (new body)
    with BuildSketch(Plane.XZ.offset(-137.3139140418)):
        with BuildLine():
            ThreePointArc((23, 75), (24.4142135624, 75.5857864376), (25, 77))
            Line((25, 77), (25, 75))
            Line((25, 75), (23, 75))
        make_face()
    extrude(amount=-F22_T122_DEPTH)

    split(bisect_by=Plane(origin=(-27.8614600507, 131.0778638485, 0), x_dir=(0, 0, 1), z_dir=(-0.2079116908, 0.9781476007, 0)), keep=Keep.TOP)


with BuildPart() as f13_1_19:
    add(f13_1_18.part)

    # F22_t119: cut F22_tool120
    add(f22_tool120.part, mode=Mode.SUBTRACT)


with BuildPart() as f22_tool125:
    # F22_s126 → F22_t127 (new body)
    with BuildSketch(Plane.XZ.offset(-182)):
        with BuildLine():
            ThreePointArc((0, 98), (0.5857864376, 99.4142135624), (2, 100))
            Line((2, 100), (0, 100))
            Line((0, 100), (0, 98))
        make_face()
    extrude(amount=F22_T127_DEPTH)

    split(bisect_by=Plane(origin=(-27.8614600507, 131.0778638485, 0), x_dir=(0, 0, 1), z_dir=(-0.2079116908, 0.9781476007, 0)), keep=Keep.TOP)


with BuildPart() as f13_1_20:
    add(f13_1_19.part)

    # F22_t124: cut F22_tool125
    add(f22_tool125.part, mode=Mode.SUBTRACT)


with BuildPart() as f22_tool131:
    # F22_s132 → F22_t133 (new body)
    with BuildSketch(Plane.XZ.offset(-35.6432670365)):
        with BuildLine():
            ThreePointArc((25, 98), (24.4142135624, 99.4142135624), (23, 100))
            Line((23, 100), (25, 100))
            Line((25, 100), (25, 98))
        make_face()
    extrude(amount=-F22_T133_DEPTH)

    split(bisect_by=Plane(origin=(-34.9845202296, 28.9355418232, 0), x_dir=(0, 0, 1), z_dir=(-0.7705799894, 0.6373432983, 0)), keep=Keep.TOP)

    split(bisect_by=Plane(origin=(0, -16.1426266471, 74.5272787043), x_dir=(1, 0, 0), z_dir=(0, 0.2116913388, -0.9773365731)), keep=Keep.TOP)


with BuildPart() as f22_tool136:
    # F22_s137 → F22_t138 (new body)
    with BuildSketch(Plane(origin=(65.9639487049, 79.7537199058, 17.2746750792), x_dir=(-0.7705799894, 0.6373432983, 0), z_dir=(0.6286469564, 0.7600656763, 0.1646304099))):
        with BuildLine():
            ThreePointArc((45.4002448925, 81.3949690485), (45.8936460368, 82.7103244711), (47.1304047803, 83.3766820231))
            Line((47.1304047803, 83.3766820231), (45.4002448925, 83.1410946579))
            Line((45.4002448925, 83.1410946579), (45.4002448925, 81.3949690485))
        make_face()
    extrude(amount=F22_T138_DEPTH)

    split(bisect_by=Plane.YZ.offset(25), keep=Keep.BOTTOM)

    split(bisect_by=Plane.XY.offset(100), keep=Keep.BOTTOM)


with BuildPart() as f22_tool131_1:
    add(f22_tool131.part)

    # F22_t141: intersect F22_tool136
    add(f22_tool136.part, mode=Mode.INTERSECT)


with BuildPart() as f13_1_21:
    add(f13_1_20.part)

    # F22_t129: cut F22_tool131
    add(f22_tool131_1.part, mode=Mode.SUBTRACT)


with BuildPart() as f22_tool144:
    # F22_s145 → F22_t146 (new body)
    with BuildSketch(Plane(origin=(-86.5725065584, 104.6704991917, 22.6716555172), x_dir=(0.7705799894, 0.6373432983, 0), z_dir=(0.6286469564, -0.7600656763, -0.1646304099))):
        with BuildLine():
            ThreePointArc((64.6647446284, 84.0181212592), (65.1581457726, 85.3334766818), (66.3949045162, 85.9998342338))
            Line((66.3949045162, 85.9998342338), (64.6647446284, 85.7642468686))
            Line((64.6647446284, 85.7642468686), (64.6647446284, 84.0181212592))
        make_face()
    extrude(amount=F22_T146_DEPTH)

    split(bisect_by=Plane.YZ, keep=Keep.TOP)

    split(bisect_by=Plane.XY.offset(100), keep=Keep.BOTTOM)


with BuildPart() as f22_tool149:
    # F22_s150 → F22_t151 (new body)
    with BuildSketch(Plane.XZ.offset(-106.4598330308)):
        with BuildLine():
            ThreePointArc((0, 98), (0.5857864376, 99.4142135624), (2, 100))
            Line((2, 100), (0, 100))
            Line((0, 100), (0, 98))
        make_face()
    extrude(amount=F22_T151_DEPTH)

    split(bisect_by=Plane(origin=(49.8293582326, 41.2136416249, 0), x_dir=(0, 0, 1), z_dir=(0.7705799894, 0.6373432983, 0)), keep=Keep.TOP)

    split(bisect_by=Plane(origin=(0, -16.1426266471, 74.5272787043), x_dir=(1, 0, 0), z_dir=(0, 0.2116913388, -0.9773365731)), keep=Keep.TOP)


with BuildPart() as f22_tool144_1:
    add(f22_tool144.part)

    # F22_t154: intersect F22_tool149
    add(f22_tool149.part, mode=Mode.INTERSECT)


with BuildPart() as f13_1_22:
    add(f13_1_21.part)

    # F22_t142: cut F22_tool144
    add(f22_tool144_1.part, mode=Mode.SUBTRACT)


with BuildPart() as f22_tool157:
    # F22_s158 → F22_t159 (new body)
    with BuildSketch(Plane.XZ.offset(-35.6432670365)):
        with BuildLine():
            ThreePointArc((23, 75), (24.4142135624, 75.5857864376), (25, 77))
            Line((25, 77), (25, 75))
            Line((25, 75), (23, 75))
        make_face()
    extrude(amount=-F22_T159_DEPTH)

    split(bisect_by=Plane(origin=(-34.9845202296, 28.9355418232, 0), x_dir=(0, 0, 1), z_dir=(-0.7705799894, 0.6373432983, 0)), keep=Keep.TOP)


with BuildPart() as f22_tool161:
    # F22_s162 → F22_t163 (new body)
    with BuildSketch(Plane(origin=(56.7978037382, 68.6713912604, 0), x_dir=(0, 0, 1), z_dir=(0.6373432983, 0.7705799894, 0))):
        with BuildLine():
            ThreePointArc((75, -47.4002448925), (75.5857864376, -45.9860313302), (77, -45.4002448925))
            Line((77, -45.4002448925), (75, -45.4002448925))
            Line((75, -45.4002448925), (75, -47.4002448925))
        make_face()
    extrude(amount=F22_T163_DEPTH)

    split(bisect_by=Plane.YZ.offset(25), keep=Keep.BOTTOM)


with BuildPart() as f22_tool157_1:
    add(f22_tool157.part)

    # F22_t165: intersect F22_tool161
    add(f22_tool161.part, mode=Mode.INTERSECT)


with BuildPart() as f13_1_23:
    add(f13_1_22.part)

    # F22_t155: cut F22_tool157
    add(f22_tool157_1.part, mode=Mode.SUBTRACT)


with BuildPart() as f22_tool168:
    # F22_s169 → F22_t170 (new body)
    with BuildSketch(Plane(origin=(-78.016074724, 94.3253442805, 0), x_dir=(0, 0, 1), z_dir=(0.6373432983, -0.7705799894, 0))):
        with BuildLine():
            ThreePointArc((75, -66.6647446284), (75.5857864376, -65.250531066), (77, -64.6647446284))
            Line((77, -64.6647446284), (75, -64.6647446284))
            Line((75, -64.6647446284), (75, -66.6647446284))
        make_face()
    extrude(amount=F22_T170_DEPTH)

    split(bisect_by=Plane.YZ, keep=Keep.TOP)


with BuildPart() as f22_tool172:
    # F22_s173 → F22_t174 (new body)
    with BuildSketch(Plane.XZ.offset(-106.4598330308)):
        with BuildLine():
            ThreePointArc((2, 75), (0.5857864376, 75.5857864376), (0, 77))
            Line((0, 77), (0, 75))
            Line((0, 75), (2, 75))
        make_face()
    extrude(amount=F22_T174_DEPTH)

    split(bisect_by=Plane(origin=(49.8293582326, 41.2136416249, 0), x_dir=(0, 0, 1), z_dir=(0.7705799894, 0.6373432983, 0)), keep=Keep.TOP)


with BuildPart() as f22_tool168_1:
    add(f22_tool168.part)

    # F22_t176: intersect F22_tool172
    add(f22_tool172.part, mode=Mode.INTERSECT)


with BuildPart() as f13_1_24:
    add(f13_1_23.part)

    # F22_t166: cut F22_tool168
    add(f22_tool168_1.part, mode=Mode.SUBTRACT)


solid = f13_1_24.part
